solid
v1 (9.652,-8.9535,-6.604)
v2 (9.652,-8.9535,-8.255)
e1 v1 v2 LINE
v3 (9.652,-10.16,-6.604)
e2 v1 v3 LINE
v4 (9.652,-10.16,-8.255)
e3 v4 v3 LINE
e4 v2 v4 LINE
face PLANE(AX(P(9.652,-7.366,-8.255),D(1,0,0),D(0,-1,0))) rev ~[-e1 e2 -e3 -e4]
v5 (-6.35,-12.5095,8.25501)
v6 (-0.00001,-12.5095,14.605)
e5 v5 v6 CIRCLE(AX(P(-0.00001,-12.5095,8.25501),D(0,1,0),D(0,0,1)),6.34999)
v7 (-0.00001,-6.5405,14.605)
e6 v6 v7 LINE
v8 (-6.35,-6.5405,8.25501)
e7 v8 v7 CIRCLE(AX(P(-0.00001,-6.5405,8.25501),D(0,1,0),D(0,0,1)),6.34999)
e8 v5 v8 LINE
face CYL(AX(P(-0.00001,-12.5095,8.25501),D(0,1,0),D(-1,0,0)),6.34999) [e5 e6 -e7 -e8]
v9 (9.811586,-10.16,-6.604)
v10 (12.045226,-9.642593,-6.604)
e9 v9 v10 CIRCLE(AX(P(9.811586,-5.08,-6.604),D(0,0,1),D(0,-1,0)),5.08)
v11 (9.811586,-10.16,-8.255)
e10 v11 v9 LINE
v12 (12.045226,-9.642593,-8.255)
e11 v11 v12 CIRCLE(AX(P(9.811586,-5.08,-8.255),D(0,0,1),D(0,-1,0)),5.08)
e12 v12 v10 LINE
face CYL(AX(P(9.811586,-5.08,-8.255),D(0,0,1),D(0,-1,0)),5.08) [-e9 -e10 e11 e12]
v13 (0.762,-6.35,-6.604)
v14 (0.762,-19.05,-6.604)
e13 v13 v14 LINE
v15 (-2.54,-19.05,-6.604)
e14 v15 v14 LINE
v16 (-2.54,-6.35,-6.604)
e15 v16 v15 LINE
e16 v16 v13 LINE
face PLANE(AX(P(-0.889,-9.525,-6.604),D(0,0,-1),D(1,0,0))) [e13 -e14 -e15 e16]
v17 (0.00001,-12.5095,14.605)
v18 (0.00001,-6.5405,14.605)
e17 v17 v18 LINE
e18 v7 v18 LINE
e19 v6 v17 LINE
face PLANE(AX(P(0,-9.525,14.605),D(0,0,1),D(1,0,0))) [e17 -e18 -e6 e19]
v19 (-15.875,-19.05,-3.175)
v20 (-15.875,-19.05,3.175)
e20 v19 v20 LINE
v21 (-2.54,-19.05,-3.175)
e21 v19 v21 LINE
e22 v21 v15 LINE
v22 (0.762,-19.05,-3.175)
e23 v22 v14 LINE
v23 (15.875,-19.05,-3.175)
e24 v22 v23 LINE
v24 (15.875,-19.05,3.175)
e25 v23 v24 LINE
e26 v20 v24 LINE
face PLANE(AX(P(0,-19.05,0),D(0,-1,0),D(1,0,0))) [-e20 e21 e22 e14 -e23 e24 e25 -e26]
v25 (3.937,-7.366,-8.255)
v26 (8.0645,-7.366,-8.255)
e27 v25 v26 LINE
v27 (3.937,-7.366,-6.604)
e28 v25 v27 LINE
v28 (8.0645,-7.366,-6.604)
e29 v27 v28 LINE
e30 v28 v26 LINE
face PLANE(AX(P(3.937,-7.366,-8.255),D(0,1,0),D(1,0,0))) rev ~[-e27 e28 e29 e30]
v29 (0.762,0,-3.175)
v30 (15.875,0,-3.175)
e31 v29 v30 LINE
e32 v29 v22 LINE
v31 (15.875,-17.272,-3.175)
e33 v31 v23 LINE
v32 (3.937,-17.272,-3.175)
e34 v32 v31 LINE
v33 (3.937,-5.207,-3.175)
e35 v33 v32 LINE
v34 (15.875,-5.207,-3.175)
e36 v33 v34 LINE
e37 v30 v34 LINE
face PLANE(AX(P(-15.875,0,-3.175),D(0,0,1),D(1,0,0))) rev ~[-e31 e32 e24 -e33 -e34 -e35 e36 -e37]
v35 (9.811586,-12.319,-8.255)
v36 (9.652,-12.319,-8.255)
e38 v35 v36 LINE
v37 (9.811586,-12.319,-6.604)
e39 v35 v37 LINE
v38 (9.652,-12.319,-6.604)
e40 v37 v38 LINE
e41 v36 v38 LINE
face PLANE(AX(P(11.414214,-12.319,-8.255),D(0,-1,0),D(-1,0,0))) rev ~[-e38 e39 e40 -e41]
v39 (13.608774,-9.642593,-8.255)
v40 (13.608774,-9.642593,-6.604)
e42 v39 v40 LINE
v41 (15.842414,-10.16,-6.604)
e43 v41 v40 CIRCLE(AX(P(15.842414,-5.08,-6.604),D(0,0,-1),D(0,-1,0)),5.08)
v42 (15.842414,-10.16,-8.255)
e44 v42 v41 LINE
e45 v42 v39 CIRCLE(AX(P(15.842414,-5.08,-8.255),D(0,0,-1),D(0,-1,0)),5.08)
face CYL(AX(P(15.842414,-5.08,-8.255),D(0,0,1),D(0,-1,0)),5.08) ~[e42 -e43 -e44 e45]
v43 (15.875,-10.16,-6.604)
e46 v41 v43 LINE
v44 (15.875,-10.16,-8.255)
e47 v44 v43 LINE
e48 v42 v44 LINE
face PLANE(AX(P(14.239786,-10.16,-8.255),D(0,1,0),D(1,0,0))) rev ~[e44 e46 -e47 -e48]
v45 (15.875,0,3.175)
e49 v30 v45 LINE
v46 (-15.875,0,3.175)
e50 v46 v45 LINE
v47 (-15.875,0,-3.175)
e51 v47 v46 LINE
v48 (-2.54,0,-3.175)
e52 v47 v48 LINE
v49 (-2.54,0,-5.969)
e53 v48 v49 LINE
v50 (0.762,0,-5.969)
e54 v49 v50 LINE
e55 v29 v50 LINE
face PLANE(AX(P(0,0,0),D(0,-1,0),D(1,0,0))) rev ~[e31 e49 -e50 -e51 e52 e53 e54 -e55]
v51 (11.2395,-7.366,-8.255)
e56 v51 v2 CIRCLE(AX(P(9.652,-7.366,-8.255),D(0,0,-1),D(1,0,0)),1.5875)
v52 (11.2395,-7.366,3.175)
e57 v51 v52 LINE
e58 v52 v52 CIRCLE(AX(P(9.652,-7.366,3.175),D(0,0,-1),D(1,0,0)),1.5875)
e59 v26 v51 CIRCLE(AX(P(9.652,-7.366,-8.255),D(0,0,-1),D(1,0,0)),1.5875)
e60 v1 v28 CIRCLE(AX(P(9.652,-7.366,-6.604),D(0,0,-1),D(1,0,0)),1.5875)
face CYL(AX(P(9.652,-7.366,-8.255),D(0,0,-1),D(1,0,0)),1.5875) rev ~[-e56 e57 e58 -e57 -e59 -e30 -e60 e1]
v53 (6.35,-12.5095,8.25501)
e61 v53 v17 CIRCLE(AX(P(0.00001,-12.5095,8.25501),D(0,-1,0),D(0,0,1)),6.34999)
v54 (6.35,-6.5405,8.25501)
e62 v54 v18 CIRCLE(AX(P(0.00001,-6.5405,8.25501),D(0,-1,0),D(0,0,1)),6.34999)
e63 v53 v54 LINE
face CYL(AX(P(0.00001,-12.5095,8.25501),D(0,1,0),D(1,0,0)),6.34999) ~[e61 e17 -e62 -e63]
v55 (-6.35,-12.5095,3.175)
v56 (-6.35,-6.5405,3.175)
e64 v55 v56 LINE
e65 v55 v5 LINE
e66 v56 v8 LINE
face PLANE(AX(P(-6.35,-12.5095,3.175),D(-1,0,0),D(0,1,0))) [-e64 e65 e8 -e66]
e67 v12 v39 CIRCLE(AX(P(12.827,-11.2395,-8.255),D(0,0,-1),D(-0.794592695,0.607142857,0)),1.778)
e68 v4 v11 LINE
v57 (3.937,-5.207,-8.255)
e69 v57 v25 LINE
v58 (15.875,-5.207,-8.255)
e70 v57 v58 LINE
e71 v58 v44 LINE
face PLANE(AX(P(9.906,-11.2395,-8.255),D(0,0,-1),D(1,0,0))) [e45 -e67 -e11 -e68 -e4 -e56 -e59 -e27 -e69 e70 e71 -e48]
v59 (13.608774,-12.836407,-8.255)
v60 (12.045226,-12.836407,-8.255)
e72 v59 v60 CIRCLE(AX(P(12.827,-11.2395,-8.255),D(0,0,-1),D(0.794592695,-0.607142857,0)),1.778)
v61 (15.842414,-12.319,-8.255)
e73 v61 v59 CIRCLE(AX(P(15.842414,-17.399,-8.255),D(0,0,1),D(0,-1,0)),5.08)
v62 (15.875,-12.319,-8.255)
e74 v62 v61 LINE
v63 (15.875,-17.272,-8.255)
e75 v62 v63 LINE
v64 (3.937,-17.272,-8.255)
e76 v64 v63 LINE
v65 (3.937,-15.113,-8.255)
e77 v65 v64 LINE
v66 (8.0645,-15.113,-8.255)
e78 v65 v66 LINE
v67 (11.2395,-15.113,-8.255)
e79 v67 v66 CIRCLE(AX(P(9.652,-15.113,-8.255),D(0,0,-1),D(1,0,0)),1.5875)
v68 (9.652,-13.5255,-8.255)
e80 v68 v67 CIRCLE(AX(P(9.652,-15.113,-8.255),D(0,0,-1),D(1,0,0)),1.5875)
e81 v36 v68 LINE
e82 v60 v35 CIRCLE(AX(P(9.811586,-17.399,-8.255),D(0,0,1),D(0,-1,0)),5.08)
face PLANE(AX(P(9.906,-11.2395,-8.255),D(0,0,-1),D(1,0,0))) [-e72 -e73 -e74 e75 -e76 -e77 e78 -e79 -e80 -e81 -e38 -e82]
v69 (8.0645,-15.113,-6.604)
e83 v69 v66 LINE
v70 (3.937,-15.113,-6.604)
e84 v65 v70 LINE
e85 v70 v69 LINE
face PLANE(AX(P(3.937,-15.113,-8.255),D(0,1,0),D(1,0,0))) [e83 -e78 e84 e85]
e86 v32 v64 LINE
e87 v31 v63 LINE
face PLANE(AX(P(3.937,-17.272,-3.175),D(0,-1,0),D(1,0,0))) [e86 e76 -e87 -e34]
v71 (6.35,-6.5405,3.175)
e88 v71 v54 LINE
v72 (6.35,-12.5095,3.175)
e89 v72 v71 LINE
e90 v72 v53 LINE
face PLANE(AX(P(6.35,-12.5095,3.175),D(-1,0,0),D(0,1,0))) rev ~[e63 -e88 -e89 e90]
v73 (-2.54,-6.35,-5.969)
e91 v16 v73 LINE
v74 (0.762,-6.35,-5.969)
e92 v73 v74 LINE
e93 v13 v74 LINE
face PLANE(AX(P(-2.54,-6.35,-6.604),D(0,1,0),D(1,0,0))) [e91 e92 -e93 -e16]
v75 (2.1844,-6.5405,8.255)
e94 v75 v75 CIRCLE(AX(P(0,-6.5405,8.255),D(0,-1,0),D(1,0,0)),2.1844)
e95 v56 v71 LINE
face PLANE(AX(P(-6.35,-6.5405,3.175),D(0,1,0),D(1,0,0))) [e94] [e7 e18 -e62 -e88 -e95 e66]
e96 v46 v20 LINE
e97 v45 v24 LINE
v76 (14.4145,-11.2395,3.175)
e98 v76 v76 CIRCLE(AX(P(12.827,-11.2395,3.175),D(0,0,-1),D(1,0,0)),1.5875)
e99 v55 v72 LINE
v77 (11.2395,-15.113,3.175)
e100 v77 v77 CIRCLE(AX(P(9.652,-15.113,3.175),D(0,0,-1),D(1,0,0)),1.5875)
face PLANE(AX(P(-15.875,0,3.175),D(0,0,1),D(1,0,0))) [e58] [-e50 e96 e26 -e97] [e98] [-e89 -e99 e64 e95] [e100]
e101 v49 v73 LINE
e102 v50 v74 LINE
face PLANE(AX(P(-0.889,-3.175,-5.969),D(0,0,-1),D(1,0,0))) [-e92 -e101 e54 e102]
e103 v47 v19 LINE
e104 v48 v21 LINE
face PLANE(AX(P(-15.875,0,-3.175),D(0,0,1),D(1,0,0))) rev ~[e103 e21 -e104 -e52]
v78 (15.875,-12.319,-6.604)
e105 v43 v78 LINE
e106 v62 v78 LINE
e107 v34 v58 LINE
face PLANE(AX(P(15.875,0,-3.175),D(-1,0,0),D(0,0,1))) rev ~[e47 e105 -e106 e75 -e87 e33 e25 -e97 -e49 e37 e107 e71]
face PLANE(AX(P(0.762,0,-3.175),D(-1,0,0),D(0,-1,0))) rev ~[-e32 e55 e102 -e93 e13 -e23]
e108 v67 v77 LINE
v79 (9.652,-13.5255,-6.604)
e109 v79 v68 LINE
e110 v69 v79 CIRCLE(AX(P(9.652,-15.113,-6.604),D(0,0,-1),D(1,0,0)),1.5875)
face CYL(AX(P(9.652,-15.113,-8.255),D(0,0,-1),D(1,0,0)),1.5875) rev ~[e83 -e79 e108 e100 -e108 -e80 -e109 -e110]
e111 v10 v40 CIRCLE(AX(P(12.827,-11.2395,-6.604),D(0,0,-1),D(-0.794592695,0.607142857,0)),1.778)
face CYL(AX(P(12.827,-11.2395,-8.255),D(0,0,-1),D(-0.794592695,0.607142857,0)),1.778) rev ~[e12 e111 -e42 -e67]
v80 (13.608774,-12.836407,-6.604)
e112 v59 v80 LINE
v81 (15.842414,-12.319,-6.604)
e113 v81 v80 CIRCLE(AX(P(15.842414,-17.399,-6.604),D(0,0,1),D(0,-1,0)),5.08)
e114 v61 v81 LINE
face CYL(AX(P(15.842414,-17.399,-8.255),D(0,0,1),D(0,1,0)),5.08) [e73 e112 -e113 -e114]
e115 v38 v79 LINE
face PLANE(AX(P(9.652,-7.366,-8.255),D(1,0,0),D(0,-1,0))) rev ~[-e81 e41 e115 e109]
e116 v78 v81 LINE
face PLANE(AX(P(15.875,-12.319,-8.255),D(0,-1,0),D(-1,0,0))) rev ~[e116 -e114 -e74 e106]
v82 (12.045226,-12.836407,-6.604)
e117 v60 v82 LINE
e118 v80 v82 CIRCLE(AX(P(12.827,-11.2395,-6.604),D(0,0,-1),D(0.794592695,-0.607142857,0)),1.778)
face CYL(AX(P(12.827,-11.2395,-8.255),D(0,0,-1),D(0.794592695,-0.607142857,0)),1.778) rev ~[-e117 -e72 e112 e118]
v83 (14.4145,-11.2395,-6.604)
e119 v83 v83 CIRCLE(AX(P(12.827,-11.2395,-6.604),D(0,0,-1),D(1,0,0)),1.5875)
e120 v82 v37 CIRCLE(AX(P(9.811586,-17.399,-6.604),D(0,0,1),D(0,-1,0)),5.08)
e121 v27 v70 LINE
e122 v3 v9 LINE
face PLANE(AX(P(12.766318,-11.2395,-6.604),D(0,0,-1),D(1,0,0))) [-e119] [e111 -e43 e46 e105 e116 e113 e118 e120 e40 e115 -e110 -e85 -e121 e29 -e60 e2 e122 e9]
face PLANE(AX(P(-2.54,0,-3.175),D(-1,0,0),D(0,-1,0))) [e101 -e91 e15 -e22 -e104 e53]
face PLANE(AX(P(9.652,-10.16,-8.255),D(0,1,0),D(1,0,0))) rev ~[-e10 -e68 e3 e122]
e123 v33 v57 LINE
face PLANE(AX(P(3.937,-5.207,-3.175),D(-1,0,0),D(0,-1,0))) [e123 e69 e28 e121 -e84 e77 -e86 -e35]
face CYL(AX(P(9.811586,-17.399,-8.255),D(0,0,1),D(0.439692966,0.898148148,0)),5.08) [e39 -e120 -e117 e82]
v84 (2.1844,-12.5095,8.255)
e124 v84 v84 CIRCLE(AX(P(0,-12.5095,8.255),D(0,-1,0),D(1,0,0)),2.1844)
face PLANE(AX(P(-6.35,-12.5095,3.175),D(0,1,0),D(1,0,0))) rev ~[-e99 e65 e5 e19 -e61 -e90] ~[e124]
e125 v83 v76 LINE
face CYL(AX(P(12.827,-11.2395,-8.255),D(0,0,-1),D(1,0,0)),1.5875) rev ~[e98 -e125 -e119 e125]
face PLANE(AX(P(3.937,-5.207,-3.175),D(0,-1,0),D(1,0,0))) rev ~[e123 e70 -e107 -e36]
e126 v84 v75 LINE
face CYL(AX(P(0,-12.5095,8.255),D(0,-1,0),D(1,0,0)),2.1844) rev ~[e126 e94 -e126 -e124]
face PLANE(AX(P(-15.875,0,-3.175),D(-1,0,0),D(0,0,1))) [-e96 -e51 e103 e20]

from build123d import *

# Parameters (mm, degrees)
F0_W      = 31.75
F0_H      = 6.35
F1_DEPTH  = 19.05
F2_W      = 12.7
F2_H      = 5.969
F3_DEPTH  = 11.43
F4_R      = 6.34999
F5_R      = 2.1844
F6_DEPTH  = 25.4
F7_W      = 11.938
F7_H      = 12.065
F8_DEPTH  = 5.08
F9_W      = 5.715
F9_H      = 7.747
F10_DEPTH = 1.651
F11_R     = 1.5875
F12_DEPTH = 25.4
F13_W     = 3.302
F13_H     = 19.05
F14_DEPTH = 3.429
F15_W     = 3.302
F15_H     = 6.35
F16_DEPTH = 0.635
F18_DEPTH = 1.651
F19_R     = 5.08


# Not quite as in the source:
# - a fillet or chamfer is up to 0.001 mm smaller than in the source, because OpenCascade refuses the exact size


with BuildPart() as f1:
    # F0 (on Front) → F1 (new body)
    with BuildSketch(Plane.XZ):
        Rectangle(F0_W, F0_H)
    extrude(amount=F1_DEPTH)

    # F2 (on face) → F3 (join)
    with BuildSketch(Plane.XY.offset(3.175)):
        with Locations((0, -9.525)):
            Rectangle(F2_W, F2_H)
    extrude(amount=F3_DEPTH)

    # F4 (radius 6.35 in the source; OpenCascade refuses exactly that, so slightly less here)
    f4_edges = [f1.edges().sort_by_distance(p)[0] for p in [
        (-6.35, -9.525, 14.605),
        (6.35, -9.525, 14.605),
    ]]
    fillet(f4_edges, radius=F4_R)

    # F5 (on face) → F6 (cut)
    with BuildSketch(Plane.XZ.offset(12.5095)):
        with Locations((0, 8.255)):
            Circle(F5_R)
    extrude(amount=-F6_DEPTH, mode=Mode.SUBTRACT)

    # F7 (on face) → F8 (join)
    with BuildSketch(Plane(origin=(0, 0, -3.175), x_dir=(1, 0, 0), z_dir=(0, 0, -1))):
        with Locations((9.906, 11.2395)):
            Rectangle(F7_W, F7_H)
    extrude(amount=F8_DEPTH)

    # F9 (on face) → F10 (cut)
    with BuildSketch(Plane(origin=(0, 0, -8.255), x_dir=(1, 0, 0), z_dir=(0, 0, -1))):
        with Locations((6.7945, 11.2395)):
            Rectangle(F9_W, F9_H)
    extrude(amount=-F10_DEPTH, mode=Mode.SUBTRACT)

    # F11 (on face) → F12 (cut)
    with BuildSketch(Plane(origin=(0, 0, -8.255), x_dir=(1, 0, 0), z_dir=(0, 0, -1))):
        with Locations((9.652, 15.113)):
            Circle(F11_R)
        with Locations((9.652, 7.366)):
            Circle(F11_R)
        with Locations((12.827, 11.2395)):
            Circle(F11_R)
    extrude(amount=-F12_DEPTH, mode=Mode.SUBTRACT)

    # F13 (on face) → F14 (join)
    with BuildSketch(Plane(origin=(0, 0, -3.175), x_dir=(1, 0, 0), z_dir=(0, 0, -1))):
        with Locations((-0.889, 9.525)):
            Rectangle(F13_W, F13_H)
    extrude(amount=F14_DEPTH)

    # F15 (on face) → F16 (cut)
    with BuildSketch(Plane(origin=(0, 0, -6.604), x_dir=(1, 0, 0), z_dir=(0, 0, -1))):
        with Locations((-0.889, 3.175)):
            Rectangle(F15_W, F15_H)
    extrude(amount=-F16_DEPTH, mode=Mode.SUBTRACT)

    # F17 (on face) → F18 (cut)
    with BuildSketch(Plane(origin=(0, 0, -8.255), x_dir=(1, 0, 0), z_dir=(0, 0, -1))):
        with BuildLine():
            Line((11.4142141882, 12.319), (9.652, 12.319))
            Line((9.652, 12.319), (9.652, 10.16))
            Line((9.652, 10.16), (11.4142141882, 10.16))
            ThreePointArc((11.4142141882, 10.16), (12.827, 9.4615), (14.2397858118, 10.16))
            Line((14.2397858118, 10.16), (15.875, 10.16))
            Line((15.875, 10.16), (15.875, 12.319))
            Line((15.875, 12.319), (14.2397858118, 12.319))
            ThreePointArc((14.2397858118, 12.319), (12.827, 13.0175), (11.4142141882, 12.319))
        make_face()
    extrude(amount=-F18_DEPTH, mode=Mode.SUBTRACT)

    # F19
    f19_edges = [f1.edges().sort_by_distance(p)[0] for p in [
        (11.414214, -12.319, -7.4295),
        (14.239786, -12.319, -7.4295),
        (11.414214, -10.16, -7.4295),
        (14.239786, -10.16, -7.4295),
    ]]
    fillet(f19_edges, radius=F19_R)


solid = f1.part
